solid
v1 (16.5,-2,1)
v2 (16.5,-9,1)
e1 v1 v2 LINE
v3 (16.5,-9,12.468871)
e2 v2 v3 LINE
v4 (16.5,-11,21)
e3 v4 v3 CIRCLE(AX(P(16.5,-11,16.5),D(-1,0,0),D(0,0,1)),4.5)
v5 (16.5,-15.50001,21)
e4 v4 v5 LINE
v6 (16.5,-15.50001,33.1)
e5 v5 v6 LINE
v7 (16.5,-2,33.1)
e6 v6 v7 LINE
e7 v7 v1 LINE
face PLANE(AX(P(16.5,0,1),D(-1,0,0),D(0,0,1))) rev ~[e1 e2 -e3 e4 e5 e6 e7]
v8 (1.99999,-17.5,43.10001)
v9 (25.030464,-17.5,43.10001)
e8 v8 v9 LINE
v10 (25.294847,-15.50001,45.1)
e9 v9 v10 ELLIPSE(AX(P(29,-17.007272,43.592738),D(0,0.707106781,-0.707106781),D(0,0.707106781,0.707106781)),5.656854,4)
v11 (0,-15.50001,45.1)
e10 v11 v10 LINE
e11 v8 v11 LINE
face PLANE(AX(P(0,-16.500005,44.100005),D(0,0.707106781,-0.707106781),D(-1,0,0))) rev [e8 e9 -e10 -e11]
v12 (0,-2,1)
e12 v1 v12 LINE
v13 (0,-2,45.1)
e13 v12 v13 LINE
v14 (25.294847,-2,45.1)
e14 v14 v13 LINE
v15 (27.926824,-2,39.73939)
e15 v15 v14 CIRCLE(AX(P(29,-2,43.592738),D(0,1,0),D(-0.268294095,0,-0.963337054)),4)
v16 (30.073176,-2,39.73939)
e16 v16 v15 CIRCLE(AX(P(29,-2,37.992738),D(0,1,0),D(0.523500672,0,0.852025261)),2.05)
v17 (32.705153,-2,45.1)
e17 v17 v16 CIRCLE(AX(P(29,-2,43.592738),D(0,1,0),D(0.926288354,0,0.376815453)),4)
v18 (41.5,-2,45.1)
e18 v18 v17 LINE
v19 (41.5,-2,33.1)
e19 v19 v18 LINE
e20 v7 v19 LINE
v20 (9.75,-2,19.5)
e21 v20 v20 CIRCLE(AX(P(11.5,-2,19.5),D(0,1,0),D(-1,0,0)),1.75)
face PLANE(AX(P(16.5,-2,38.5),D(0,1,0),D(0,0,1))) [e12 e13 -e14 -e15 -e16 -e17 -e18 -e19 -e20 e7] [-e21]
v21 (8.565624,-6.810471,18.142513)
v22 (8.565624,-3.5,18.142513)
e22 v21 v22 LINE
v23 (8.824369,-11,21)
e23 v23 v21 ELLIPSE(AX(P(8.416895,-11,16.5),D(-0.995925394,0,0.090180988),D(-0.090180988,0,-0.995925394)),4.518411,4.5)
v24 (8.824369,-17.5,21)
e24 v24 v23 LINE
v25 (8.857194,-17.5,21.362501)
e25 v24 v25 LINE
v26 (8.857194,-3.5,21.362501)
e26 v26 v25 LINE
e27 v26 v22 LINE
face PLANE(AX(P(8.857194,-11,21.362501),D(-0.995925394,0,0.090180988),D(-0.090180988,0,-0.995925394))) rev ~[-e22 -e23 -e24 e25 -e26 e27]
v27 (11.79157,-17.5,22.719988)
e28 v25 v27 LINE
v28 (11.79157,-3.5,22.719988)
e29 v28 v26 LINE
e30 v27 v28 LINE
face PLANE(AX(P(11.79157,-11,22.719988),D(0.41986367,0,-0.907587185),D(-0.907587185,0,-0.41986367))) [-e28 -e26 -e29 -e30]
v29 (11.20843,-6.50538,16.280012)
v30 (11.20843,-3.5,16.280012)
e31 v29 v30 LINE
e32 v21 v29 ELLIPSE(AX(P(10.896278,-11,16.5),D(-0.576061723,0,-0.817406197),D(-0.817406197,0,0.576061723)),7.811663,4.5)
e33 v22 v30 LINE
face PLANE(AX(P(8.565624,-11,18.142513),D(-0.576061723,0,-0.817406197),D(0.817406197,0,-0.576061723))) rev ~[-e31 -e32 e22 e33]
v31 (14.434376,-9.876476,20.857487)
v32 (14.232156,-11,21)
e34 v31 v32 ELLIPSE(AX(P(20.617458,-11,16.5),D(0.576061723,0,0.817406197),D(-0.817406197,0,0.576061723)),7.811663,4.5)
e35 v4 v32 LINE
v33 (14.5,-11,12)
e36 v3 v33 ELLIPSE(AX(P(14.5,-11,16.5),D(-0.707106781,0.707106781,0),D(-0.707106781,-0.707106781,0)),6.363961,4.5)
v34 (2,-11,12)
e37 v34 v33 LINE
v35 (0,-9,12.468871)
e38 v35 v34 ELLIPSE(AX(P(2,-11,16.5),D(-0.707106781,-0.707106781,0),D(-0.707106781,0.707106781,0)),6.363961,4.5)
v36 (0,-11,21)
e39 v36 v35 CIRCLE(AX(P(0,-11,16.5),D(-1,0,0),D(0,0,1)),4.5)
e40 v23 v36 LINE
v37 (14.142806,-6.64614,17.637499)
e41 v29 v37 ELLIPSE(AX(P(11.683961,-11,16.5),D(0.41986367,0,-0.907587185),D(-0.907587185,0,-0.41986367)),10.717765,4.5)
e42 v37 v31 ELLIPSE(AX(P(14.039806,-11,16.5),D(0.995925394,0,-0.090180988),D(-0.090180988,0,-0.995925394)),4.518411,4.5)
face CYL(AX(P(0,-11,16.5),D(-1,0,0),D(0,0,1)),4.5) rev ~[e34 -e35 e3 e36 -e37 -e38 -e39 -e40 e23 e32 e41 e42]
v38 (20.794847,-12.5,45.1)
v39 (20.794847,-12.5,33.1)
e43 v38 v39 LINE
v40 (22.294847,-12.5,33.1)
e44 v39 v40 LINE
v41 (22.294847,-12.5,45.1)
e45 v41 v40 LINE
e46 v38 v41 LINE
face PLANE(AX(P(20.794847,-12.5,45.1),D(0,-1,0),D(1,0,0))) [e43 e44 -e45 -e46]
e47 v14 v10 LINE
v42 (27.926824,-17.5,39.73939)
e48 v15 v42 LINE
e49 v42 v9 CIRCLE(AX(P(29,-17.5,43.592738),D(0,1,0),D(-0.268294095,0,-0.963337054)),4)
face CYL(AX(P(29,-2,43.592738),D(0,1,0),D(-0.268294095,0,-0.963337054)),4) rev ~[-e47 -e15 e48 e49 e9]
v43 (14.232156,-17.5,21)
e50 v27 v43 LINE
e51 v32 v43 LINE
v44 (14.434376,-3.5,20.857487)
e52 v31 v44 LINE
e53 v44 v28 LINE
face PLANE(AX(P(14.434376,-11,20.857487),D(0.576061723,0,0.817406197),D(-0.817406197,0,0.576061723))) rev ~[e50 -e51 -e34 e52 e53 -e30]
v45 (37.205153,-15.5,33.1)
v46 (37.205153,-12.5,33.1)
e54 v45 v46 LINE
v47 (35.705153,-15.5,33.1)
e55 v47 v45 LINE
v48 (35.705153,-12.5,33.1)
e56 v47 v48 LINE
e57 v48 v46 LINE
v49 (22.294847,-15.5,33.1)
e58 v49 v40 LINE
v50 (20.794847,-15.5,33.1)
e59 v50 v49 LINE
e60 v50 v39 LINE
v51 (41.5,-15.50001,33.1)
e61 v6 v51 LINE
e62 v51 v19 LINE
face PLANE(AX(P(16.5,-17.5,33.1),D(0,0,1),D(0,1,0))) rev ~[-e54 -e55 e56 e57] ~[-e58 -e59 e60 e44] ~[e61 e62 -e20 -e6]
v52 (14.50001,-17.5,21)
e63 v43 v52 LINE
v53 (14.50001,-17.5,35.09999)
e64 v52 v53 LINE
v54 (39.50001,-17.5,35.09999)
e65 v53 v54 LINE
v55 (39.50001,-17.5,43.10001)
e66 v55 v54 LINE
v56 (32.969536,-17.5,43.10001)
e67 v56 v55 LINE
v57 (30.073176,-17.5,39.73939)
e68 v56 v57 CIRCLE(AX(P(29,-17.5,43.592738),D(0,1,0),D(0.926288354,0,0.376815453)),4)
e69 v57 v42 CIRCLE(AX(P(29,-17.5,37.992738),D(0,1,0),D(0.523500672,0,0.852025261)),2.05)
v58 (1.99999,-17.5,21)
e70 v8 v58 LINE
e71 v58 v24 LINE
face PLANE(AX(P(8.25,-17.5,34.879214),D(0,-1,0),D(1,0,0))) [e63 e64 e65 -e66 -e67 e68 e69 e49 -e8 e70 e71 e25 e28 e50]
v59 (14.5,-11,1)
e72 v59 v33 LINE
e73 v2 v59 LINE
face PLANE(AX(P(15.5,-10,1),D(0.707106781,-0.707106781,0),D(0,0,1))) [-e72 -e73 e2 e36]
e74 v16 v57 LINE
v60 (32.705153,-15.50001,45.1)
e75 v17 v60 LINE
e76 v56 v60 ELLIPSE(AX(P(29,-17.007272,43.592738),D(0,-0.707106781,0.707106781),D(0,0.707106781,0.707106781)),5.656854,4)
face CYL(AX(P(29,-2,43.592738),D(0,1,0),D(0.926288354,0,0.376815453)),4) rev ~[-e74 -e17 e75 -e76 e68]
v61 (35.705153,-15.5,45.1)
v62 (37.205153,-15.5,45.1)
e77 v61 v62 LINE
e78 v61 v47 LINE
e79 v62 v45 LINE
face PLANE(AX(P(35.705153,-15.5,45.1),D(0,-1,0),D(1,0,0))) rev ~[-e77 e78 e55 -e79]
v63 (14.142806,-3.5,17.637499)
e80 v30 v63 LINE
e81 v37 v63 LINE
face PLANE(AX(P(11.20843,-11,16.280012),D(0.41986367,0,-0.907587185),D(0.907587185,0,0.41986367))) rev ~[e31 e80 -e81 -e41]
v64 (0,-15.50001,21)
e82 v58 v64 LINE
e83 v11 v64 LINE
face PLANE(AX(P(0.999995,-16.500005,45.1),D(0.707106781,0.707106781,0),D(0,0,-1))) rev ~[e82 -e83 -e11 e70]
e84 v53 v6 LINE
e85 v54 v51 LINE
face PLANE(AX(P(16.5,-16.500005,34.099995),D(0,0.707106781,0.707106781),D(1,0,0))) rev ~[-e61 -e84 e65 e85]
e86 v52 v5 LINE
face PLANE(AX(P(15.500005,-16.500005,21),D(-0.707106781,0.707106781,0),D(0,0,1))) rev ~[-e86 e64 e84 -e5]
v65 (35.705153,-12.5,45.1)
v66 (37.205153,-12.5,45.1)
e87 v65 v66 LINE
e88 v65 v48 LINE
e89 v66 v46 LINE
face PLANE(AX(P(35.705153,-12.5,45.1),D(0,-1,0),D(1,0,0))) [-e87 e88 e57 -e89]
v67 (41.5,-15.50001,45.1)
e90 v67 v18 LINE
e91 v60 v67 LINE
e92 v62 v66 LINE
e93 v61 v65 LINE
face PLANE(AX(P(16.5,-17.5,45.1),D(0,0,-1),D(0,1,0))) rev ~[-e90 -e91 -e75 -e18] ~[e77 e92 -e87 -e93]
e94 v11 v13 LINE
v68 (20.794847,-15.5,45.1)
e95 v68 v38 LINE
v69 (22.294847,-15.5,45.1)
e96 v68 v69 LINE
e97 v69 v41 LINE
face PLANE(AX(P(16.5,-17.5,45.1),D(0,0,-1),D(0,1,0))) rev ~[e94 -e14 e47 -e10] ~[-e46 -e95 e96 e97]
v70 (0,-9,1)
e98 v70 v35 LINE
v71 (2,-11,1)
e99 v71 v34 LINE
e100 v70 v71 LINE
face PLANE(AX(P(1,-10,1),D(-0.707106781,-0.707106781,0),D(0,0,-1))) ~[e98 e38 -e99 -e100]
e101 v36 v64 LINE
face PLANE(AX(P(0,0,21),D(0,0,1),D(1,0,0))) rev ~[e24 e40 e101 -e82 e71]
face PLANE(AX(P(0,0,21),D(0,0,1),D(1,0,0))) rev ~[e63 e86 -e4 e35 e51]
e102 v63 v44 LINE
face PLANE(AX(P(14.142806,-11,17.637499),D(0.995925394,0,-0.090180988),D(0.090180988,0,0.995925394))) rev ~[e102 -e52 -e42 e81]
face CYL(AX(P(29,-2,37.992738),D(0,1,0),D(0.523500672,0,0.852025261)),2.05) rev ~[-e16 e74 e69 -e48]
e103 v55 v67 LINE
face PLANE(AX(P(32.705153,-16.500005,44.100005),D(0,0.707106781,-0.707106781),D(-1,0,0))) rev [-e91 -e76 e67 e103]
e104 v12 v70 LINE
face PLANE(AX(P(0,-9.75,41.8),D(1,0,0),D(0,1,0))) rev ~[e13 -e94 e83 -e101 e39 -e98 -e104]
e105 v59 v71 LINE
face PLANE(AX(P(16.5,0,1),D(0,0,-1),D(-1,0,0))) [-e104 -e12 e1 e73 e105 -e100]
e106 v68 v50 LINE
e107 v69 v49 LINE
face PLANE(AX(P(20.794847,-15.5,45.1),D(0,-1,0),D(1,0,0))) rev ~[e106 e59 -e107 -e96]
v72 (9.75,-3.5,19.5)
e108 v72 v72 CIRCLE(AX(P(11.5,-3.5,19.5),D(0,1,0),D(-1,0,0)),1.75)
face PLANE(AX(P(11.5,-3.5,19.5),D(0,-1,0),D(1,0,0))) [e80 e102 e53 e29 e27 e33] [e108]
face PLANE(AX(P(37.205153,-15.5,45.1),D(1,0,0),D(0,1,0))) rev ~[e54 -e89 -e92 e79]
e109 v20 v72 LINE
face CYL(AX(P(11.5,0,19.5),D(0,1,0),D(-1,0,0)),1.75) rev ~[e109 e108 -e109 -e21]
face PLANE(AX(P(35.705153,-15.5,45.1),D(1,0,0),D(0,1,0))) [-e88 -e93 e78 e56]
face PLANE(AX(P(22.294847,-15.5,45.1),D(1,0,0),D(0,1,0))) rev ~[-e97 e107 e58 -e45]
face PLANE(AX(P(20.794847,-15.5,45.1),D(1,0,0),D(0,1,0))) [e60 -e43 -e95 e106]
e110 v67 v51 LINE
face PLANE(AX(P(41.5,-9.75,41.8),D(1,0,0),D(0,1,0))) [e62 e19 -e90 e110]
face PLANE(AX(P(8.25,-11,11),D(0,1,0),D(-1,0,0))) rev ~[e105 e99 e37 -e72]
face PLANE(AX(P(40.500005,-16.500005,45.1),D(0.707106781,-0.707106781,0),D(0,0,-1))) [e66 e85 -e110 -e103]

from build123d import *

# Parameters (mm, degrees)
F1_DEPTH  = 17.5
F2_W      = 16.5
F2_H      = 20
F3_DEPTH  = 11
F4_R      = 1.75
F6_DEPTH  = 22.5
F8_DEPTH  = 7.5
F9_DEPTH  = 13.1
F10_DEPTH = 24.9
F11_R     = 1.75
F12_DEPTH = 2
F13_W     = 15.5
F13_H     = 6.6
F13_H_2   = 5.4
F14_DEPTH = 25
F15_DEPTH = 16.5
F17_DEPTH = 25
F18_W     = 1.5
F18_H     = 3
F19_DEPTH = 25
F21_DEPTH = 15.5
F22_SIZE  = 1.99999
F23_SIZE  = 2


# Not quite as in the source:
# - a fillet or chamfer is up to 0.001 mm smaller than in the source, because OpenCascade refuses the exact size


with BuildPart() as f1:
    # F0 (on Front) → F1 (new body)
    with BuildSketch(Plane.XZ):
        with BuildLine():
            Line((16.5, 21), (16.5, 21.3678174192))
            Line((16.5, 21.3678174192), (16.5, 38.5))
            Line((16.5, 38.5), (11.9580992435, 38.5))
            ThreePointArc((11.9580992435, 38.5), (11.8488094961, 35.2539844758), (9.3668783978, 33.1590909091))
            ThreePointArc((9.3668783978, 33.1590909091), (8.25, 29.3900555271), (7.1331216022, 33.1590909091))
            ThreePointArc((7.1331216022, 33.1590909091), (4.6511905039, 35.2539844758), (4.5419007565, 38.5))
            Line((4.5419007565, 38.5), (0, 38.5))
            Line((0, 38.5), (0, 21.3678174192))
            Line((0, 21.3678174192), (0, 21))
            Line((0, 21), (8.25, 21))
            Line((8.25, 21), (16.5, 21))
        make_face()
    extrude(amount=F1_DEPTH)

    # F2 (on face) → F3 (join)
    with BuildSketch(Plane(origin=(0, 0, 0), x_dir=(-1, 0, 0), z_dir=(0, 1, 0))):
        with Locations((-8.25, 11)):
            Rectangle(F2_W, F2_H)
    extrude(amount=-F3_DEPTH)

    # F4 (on face) → F6 (cut)
    with BuildSketch(Plane(origin=(0, 0, 0), x_dir=(-1, 0, 0), z_dir=(0, 1, 0))):
        with Locations((-11.5, 19.5)):
            Circle(F4_R)
    extrude(amount=-F6_DEPTH, mode=Mode.SUBTRACT)

    # F7 (on face) → F8 (cut)
    with BuildSketch(Plane.XZ.offset(11)):
        Polygon((14.1428062528, 17.6374994111), (14.4343759509, 20.8574870578), (11.7915696981, 22.7199876466), (8.8571937472, 21.3625005889), (8.5656240491, 18.1425129422), (11.2084303019, 16.2800123534), align=None)
    extrude(amount=-F8_DEPTH, mode=Mode.SUBTRACT)

    # F7 (on face) → F9 (cut)
    with BuildSketch(Plane.XZ.offset(11)):
        Polygon((14.1428062528, 17.6374994111), (14.4343759509, 20.8574870578), (11.7915696981, 22.7199876466), (8.8571937472, 21.3625005889), (8.5656240491, 18.1425129422), (11.2084303019, 16.2800123534), align=None)
    extrude(amount=F9_DEPTH, mode=Mode.SUBTRACT)

    # F5 (on face) → F10 (cut)
    with BuildSketch(Plane(origin=(0, 0, 0), x_dir=(0, -1, 0), z_dir=(-1, 0, 0))):
        with BuildLine():
            Line((11, 16.5), (11, 21))
            ThreePointArc((11, 21), (6.5, 16.5), (11, 12))
            Line((11, 12), (11, 16.5))
        make_face()
    extrude(amount=-F10_DEPTH, mode=Mode.SUBTRACT)

    # F11 (on face) → F12 (cut)
    with BuildSketch(Plane(origin=(0, 0, 0), x_dir=(-1, 0, 0), z_dir=(0, 1, 0))):
        with BuildLine():
            Line((-11.9580992435, 38.5), (-16.5, 38.5))
            Line((-16.5, 38.5), (-16.5, 1))
            Line((-16.5, 1), (0, 1))
            Line((0, 1), (0, 38.5))
            Line((0, 38.5), (-4.5419007565, 38.5))
            ThreePointArc((-4.5419007565, 38.5), (-4.6511905039, 35.2539844758), (-7.1331216022, 33.1590909091))
            ThreePointArc((-7.1331216022, 33.1590909091), (-8.25, 29.3900555271), (-9.3668783978, 33.1590909091))
            ThreePointArc((-9.3668783978, 33.1590909091), (-11.8488094961, 35.2539844758), (-11.9580992435, 38.5))
        make_face()
        with Locations((-11.5, 19.5)):
            Circle(F11_R, mode=Mode.SUBTRACT)
    extrude(amount=-F12_DEPTH, mode=Mode.SUBTRACT)

    # F13 (on face) → F14 (join)
    with BuildSketch(Plane.YZ.offset(16.5)):
        with Locations((-9.75, 41.8)):
            Rectangle(F13_W, F13_H)
        with Locations((-9.75, 35.8)):
            Rectangle(F13_W, F13_H_2)
    extrude(amount=F14_DEPTH)

    # F15 (add): a face of the model
    f15_faces = [f1.faces().sort_by_distance(p)[0] for p in [
        (16.5, -9.75, 41.8),
    ]]
    extrude(f15_faces, amount=F15_DEPTH)

    # F16 (on face) → F17 (cut)
    with BuildSketch(Plane(origin=(0, -2, 0), x_dir=(-1, 0, 0), z_dir=(0, 1, 0))):
        with BuildLine():
            ThreePointArc((-30.0731763785, 39.739389973), (-29, 35.9427381873), (-27.9268236215, 39.739389973))
            ThreePointArc((-27.9268236215, 39.739389973), (-25.4094368312, 41.8298269216), (-25.2948465851, 45.1))
            Line((-25.2948465851, 45.1), (-32.7051534149, 45.1))
            ThreePointArc((-32.7051534149, 45.1), (-32.5905631688, 41.8298269216), (-30.0731763785, 39.739389973))
        make_face()
    extrude(amount=-F17_DEPTH, mode=Mode.SUBTRACT)

    # F18 (on face) → F19 (cut)
    with BuildSketch(Plane.XY.offset(45.1)):
        with Locations((21.5448465851, -14)):
            Rectangle(F18_W, F18_H)
        with Locations((36.4551534149, -14)):
            Rectangle(F18_W, F18_H)
    extrude(amount=-F19_DEPTH, mode=Mode.SUBTRACT)

    # F20 (on face) → F21 (join)
    with BuildSketch(Plane.XZ.offset(17.5)):
        with BuildLine():
            Line((10.089985095, 38.5), (10.0875691268, 38.5))
            Line((10.0875691268, 38.5), (4.5419007565, 38.5))
            ThreePointArc((4.5419007565, 38.5), (4.6511905039, 35.2539844758), (7.1331216022, 33.1590909091))
            ThreePointArc((7.1331216022, 33.1590909091), (8.25, 29.3900555271), (9.3668783978, 33.1590909091))
            ThreePointArc((9.3668783978, 33.1590909091), (11.8488094961, 35.2539844758), (11.9580992435, 38.5))
            Line((11.9580992435, 38.5), (10.089985095, 38.5))
        make_face()
    extrude(amount=-F21_DEPTH)

    # F22 (size 2 in the source; OpenCascade refuses exactly that, so slightly less here)
    f22_edges = [f1.edges().sort_by_distance(p)[0] for p in [
        (41.5, -17.5, 39.1),
        (0, -17.5, 33.05),
        (16.5, -17.5, 27.05),
        (29, -17.5, 33.1),
        (12.647423, -17.5, 45.1),
        (37.102577, -17.5, 45.1),
    ]]
    chamfer(f22_edges, length=F22_SIZE)

    # F23
    f23_edges = [f1.edges().sort_by_distance(p)[0] for p in [
        (0, -11, 6.5),
        (16.5, -11, 6.5),
    ]]
    chamfer(f23_edges, length=F23_SIZE)


solid = f1.part
